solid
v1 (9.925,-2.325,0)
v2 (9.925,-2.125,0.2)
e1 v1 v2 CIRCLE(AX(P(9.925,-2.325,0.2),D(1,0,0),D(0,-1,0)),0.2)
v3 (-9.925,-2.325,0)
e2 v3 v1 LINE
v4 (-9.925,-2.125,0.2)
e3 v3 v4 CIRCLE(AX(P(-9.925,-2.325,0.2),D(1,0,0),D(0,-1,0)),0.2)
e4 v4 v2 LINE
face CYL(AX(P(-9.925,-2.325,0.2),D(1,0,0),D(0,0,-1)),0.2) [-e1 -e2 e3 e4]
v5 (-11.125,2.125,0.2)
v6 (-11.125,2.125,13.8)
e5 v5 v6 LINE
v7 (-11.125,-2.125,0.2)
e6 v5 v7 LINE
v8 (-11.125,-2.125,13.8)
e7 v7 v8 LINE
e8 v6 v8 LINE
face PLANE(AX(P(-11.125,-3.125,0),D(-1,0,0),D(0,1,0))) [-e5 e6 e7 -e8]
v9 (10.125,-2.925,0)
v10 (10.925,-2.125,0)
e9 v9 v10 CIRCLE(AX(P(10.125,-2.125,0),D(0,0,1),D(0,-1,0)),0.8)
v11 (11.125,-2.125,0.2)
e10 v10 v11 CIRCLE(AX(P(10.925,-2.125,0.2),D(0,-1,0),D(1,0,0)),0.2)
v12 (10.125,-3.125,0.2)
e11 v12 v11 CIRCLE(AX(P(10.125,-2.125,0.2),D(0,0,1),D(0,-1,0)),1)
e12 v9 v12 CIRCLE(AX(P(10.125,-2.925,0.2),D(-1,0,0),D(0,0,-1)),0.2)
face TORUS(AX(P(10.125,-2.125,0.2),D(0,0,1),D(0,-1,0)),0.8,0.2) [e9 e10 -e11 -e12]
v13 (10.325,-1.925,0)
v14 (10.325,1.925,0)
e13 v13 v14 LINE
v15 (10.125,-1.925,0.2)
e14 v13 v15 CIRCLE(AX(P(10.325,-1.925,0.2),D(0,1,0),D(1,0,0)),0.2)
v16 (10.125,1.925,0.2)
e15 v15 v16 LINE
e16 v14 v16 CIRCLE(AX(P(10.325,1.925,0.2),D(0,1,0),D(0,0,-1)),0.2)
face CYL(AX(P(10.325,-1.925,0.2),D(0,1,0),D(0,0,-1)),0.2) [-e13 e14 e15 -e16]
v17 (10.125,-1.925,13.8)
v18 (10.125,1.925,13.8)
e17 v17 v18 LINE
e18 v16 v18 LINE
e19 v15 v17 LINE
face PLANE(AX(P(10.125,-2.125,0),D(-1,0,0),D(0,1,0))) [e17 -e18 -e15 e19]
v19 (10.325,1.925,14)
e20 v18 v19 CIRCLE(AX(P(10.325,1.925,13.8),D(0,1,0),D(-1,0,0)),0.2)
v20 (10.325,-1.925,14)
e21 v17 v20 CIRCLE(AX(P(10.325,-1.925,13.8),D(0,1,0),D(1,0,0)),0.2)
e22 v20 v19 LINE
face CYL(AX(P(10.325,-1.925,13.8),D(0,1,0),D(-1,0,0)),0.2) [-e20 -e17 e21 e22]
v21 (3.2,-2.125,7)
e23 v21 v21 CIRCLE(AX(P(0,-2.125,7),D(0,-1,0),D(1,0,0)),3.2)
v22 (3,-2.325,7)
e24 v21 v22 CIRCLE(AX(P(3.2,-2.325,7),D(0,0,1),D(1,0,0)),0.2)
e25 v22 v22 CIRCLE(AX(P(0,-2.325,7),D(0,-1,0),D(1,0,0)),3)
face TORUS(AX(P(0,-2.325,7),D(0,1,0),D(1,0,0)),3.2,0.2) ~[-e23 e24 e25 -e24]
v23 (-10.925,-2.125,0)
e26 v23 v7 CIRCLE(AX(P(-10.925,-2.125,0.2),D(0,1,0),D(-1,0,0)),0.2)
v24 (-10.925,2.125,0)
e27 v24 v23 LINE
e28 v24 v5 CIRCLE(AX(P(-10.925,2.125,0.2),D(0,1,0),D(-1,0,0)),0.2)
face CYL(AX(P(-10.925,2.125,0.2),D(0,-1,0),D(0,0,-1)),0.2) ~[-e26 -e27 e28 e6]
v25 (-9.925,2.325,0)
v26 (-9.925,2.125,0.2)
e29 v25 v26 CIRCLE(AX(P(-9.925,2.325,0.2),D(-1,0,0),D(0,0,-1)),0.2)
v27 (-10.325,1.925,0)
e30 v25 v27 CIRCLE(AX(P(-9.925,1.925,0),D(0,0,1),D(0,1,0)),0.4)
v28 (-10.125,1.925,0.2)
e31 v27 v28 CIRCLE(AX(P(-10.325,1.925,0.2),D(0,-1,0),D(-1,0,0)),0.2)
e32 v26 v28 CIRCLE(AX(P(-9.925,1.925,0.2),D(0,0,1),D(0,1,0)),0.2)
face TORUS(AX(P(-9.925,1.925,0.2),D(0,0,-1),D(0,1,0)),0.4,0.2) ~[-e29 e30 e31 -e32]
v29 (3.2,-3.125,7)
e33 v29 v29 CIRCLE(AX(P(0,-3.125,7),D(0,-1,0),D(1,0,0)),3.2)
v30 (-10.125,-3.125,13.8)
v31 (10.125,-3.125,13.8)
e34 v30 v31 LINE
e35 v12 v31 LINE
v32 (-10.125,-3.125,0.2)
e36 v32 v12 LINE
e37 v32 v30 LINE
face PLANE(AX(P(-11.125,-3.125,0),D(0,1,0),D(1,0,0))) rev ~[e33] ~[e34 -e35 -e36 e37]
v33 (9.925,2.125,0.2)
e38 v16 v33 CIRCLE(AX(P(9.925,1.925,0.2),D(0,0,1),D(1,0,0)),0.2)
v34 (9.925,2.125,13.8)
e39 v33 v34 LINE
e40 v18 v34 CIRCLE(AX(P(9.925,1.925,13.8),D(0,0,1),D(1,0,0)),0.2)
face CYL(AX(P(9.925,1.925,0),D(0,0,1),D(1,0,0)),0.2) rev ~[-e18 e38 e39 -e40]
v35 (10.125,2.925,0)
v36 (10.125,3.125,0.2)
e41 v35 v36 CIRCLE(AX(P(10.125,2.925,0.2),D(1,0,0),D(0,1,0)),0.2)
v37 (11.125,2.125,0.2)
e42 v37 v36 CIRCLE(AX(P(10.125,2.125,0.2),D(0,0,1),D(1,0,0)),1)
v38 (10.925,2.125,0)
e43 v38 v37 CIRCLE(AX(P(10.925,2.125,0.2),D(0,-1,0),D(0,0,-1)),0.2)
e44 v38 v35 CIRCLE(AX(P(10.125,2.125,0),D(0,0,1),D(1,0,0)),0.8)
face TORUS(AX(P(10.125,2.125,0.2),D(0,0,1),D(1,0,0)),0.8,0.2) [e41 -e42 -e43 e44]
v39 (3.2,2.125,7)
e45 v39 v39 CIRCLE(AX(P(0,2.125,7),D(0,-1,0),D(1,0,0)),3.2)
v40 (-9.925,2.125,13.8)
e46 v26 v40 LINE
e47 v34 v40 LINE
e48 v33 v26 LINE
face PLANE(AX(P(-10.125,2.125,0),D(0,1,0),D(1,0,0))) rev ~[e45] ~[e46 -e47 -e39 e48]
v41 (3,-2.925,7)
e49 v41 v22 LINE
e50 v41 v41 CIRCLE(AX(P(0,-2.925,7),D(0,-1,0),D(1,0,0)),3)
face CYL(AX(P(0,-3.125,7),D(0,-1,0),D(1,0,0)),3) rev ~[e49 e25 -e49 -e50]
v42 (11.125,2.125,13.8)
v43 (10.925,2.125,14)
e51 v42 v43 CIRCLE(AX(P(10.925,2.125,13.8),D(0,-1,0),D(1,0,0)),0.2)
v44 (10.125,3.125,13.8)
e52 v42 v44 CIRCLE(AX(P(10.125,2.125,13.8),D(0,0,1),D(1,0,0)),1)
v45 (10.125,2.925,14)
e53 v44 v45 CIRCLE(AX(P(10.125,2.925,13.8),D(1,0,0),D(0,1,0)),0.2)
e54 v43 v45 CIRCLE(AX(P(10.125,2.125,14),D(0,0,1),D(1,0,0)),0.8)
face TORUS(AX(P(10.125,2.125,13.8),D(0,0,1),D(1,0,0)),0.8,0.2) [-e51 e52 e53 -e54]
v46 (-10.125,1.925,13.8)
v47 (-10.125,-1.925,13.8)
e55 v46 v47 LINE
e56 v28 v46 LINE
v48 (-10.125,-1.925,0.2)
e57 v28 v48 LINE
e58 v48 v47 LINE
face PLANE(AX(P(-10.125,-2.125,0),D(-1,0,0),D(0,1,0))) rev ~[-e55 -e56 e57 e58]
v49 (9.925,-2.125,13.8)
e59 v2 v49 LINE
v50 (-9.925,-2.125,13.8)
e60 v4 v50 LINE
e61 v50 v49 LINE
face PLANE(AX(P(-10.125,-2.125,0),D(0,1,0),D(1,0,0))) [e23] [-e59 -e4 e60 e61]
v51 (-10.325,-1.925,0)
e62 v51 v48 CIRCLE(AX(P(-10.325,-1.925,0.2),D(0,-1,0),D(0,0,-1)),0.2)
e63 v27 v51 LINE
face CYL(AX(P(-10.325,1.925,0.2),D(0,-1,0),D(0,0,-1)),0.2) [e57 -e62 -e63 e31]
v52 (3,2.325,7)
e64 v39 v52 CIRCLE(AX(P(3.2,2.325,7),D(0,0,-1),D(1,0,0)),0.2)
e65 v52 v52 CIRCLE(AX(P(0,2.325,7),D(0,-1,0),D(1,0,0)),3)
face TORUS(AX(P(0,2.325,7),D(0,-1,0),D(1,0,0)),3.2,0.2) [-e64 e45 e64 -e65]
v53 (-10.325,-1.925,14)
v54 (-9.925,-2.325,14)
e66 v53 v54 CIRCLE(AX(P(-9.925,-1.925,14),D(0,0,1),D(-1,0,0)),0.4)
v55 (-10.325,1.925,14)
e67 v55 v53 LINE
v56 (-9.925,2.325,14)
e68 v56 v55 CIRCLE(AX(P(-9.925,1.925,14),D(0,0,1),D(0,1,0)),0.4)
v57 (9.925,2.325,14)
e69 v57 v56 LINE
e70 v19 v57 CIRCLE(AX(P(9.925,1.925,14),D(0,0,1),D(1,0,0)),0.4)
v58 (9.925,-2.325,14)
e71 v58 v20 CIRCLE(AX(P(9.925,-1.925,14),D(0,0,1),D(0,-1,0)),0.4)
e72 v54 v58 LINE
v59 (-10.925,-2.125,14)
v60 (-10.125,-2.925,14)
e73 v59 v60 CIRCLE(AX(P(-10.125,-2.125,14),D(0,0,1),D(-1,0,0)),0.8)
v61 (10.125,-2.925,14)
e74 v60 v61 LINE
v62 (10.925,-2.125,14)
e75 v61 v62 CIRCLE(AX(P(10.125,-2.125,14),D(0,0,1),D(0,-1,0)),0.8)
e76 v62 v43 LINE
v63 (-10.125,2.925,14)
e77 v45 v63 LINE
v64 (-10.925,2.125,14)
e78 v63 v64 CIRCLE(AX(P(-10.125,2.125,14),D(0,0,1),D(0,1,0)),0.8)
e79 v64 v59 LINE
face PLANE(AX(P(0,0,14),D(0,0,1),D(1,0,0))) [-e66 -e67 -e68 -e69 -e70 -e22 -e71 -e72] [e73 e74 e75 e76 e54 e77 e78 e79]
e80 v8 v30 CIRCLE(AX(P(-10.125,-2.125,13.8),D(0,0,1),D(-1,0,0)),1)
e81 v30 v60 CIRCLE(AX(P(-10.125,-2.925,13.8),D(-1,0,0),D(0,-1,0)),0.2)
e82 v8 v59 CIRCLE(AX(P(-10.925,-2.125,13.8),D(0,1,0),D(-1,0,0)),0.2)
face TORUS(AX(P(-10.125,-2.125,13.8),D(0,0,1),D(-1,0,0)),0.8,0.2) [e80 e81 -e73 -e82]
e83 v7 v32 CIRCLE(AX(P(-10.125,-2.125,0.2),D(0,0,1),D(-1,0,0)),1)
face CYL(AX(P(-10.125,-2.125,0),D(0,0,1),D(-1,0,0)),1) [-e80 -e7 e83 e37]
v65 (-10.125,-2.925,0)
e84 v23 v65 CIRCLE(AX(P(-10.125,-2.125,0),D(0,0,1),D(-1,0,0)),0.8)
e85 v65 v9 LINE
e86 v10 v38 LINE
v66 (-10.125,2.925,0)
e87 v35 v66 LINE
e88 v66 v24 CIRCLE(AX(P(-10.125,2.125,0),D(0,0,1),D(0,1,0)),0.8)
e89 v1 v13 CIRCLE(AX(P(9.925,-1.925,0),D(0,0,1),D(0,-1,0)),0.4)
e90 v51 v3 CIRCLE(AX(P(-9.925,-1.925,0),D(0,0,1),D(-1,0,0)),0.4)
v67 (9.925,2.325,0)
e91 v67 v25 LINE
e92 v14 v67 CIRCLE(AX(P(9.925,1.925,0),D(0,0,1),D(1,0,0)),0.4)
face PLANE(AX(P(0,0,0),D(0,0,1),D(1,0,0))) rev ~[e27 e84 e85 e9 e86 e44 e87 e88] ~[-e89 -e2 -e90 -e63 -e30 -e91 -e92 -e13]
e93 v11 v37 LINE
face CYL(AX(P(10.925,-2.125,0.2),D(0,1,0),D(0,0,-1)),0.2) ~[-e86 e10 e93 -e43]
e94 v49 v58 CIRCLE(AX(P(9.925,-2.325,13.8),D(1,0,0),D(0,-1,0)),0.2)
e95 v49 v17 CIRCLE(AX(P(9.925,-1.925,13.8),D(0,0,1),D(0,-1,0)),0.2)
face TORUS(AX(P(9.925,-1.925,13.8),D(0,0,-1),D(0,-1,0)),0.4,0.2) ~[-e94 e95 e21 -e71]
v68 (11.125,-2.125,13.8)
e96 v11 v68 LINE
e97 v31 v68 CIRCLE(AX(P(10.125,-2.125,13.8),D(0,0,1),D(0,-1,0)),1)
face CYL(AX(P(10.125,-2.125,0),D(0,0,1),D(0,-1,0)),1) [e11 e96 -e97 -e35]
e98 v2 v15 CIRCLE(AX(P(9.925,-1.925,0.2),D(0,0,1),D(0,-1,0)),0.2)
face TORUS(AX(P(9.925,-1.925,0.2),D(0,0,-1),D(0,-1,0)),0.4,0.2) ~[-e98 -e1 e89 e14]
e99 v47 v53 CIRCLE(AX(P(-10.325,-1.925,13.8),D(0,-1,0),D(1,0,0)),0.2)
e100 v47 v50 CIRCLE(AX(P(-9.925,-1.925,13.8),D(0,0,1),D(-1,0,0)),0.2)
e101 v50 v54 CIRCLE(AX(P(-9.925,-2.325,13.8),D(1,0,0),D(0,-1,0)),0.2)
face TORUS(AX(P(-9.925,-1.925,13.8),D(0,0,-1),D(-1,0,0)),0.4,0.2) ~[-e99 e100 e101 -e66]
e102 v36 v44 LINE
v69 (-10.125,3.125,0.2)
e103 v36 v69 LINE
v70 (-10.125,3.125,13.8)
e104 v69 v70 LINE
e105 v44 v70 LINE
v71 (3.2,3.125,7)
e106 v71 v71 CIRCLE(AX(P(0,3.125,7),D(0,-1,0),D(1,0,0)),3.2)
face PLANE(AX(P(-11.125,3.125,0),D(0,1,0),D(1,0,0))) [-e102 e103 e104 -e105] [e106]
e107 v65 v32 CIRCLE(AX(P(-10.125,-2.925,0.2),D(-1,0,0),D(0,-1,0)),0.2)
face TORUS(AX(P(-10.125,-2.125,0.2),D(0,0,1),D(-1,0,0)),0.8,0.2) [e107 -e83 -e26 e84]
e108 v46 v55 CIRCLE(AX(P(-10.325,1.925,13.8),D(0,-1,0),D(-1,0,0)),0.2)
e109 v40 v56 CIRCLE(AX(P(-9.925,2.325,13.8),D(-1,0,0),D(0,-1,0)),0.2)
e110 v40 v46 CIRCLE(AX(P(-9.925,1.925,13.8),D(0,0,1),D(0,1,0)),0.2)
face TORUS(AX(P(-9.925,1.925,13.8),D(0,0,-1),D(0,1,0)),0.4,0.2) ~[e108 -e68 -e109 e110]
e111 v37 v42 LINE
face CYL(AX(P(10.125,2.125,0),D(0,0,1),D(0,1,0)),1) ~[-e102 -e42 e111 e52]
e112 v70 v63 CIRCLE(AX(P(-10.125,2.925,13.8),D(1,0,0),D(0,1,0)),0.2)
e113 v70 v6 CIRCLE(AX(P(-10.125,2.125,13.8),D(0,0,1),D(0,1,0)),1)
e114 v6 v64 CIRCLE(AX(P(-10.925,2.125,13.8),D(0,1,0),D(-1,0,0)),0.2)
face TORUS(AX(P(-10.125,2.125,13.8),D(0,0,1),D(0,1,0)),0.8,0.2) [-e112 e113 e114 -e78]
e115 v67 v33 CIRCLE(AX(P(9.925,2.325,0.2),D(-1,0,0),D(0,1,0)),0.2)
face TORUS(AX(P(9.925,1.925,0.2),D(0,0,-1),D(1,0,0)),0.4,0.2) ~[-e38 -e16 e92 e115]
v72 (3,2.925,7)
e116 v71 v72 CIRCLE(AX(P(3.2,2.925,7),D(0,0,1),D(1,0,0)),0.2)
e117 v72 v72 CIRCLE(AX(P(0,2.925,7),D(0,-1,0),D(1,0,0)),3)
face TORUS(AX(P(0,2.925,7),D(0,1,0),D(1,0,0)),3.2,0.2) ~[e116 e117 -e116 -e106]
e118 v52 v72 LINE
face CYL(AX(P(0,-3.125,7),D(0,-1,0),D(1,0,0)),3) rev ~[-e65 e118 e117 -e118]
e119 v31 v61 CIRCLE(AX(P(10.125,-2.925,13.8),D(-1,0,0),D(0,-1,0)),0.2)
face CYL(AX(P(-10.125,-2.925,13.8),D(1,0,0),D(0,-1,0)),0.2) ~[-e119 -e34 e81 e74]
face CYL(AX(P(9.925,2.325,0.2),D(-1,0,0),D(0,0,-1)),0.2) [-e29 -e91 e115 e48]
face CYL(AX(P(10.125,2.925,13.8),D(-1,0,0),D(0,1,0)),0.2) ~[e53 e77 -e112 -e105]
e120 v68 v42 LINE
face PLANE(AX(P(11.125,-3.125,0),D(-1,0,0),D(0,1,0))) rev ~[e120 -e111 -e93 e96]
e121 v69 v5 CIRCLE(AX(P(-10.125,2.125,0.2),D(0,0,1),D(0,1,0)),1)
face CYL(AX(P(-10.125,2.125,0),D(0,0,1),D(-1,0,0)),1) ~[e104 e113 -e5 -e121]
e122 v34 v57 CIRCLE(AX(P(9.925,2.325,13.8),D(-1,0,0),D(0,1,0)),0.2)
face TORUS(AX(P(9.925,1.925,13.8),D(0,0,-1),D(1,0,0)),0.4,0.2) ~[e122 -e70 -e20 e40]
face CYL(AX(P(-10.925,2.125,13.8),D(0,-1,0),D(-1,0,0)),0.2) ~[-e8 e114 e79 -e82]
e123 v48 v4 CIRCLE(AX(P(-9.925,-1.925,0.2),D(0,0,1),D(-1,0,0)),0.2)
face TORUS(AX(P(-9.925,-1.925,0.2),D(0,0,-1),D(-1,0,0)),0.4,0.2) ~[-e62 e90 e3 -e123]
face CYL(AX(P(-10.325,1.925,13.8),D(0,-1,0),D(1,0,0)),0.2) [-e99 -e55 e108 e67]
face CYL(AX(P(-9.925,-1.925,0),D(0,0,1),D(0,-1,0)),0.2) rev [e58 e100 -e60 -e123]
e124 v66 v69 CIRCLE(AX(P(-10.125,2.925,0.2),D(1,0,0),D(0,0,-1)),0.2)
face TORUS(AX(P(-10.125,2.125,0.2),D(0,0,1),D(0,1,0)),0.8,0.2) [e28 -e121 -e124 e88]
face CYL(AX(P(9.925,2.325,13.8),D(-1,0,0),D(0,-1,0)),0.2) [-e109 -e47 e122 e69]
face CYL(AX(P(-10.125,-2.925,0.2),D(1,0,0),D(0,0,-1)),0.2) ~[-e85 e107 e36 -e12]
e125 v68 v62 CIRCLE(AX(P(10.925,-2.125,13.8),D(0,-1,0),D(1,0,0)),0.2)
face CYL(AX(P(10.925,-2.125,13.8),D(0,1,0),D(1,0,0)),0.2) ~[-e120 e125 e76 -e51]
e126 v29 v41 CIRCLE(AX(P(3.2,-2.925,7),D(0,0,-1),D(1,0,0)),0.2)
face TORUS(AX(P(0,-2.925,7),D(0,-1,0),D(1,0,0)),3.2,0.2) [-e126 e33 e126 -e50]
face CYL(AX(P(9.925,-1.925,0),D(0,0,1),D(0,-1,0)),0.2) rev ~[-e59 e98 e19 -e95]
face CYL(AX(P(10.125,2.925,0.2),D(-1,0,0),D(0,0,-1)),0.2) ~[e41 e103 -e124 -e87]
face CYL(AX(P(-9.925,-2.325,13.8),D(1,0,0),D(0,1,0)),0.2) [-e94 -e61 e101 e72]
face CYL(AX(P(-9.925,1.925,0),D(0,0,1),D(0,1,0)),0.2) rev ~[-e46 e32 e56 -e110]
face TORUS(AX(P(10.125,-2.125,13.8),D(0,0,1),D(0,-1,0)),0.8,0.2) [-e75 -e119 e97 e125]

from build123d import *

# Parameters (mm, degrees)
F0_W     = 22.25
F0_H     = 6.25
F0_W_2   = 20.25
F0_H_2   = 4.25
F1_DEPTH = 14
F2_R     = 1
F3_R     = 0.2
F4_R     = 0.2
F5_R     = 3
F6_DEPTH = 6.251
F7_R     = 0.2


with BuildPart() as f1:
    # F0 (on Top) → F1 (new body)
    with BuildSketch(Plane.XY):
        Rectangle(F0_W, F0_H)
        Rectangle(F0_W_2, F0_H_2, mode=Mode.SUBTRACT)
    extrude(amount=F1_DEPTH)

    # F2
    f2_edges = [f1.edges().sort_by_distance(p)[0] for p in [
        (-11.125, -3.125, 7),
        (-11.125, 3.125, 7),
        (11.125, 3.125, 7),
        (11.125, -3.125, 7),
    ]]
    fillet(f2_edges, radius=F2_R)

    # F3
    f3_edges = [f1.edges().sort_by_distance(p)[0] for p in [
        (-10.125, 2.125, 7),
        (-10.125, -2.125, 7),
        (10.125, 2.125, 7),
        (10.125, -2.125, 7),
    ]]
    fillet(f3_edges, radius=F3_R)

    # F4
    f4_edges = [f1.edges().sort_by_distance(p)[0] for p in [
        (-10.832107, -2.832107, 14),
        (-10.832107, -2.832107, 0),
        (10.066421, -2.066421, 14),
        (10.066421, -2.066421, 0),
        (10.125, 0, 0),
        (10.066421, 2.066421, 0),
        (0, 2.125, 0),
        (0, -2.125, 0),
        (-10.066421, 2.066421, 0),
        (-10.066421, -2.066421, 0),
        (-10.125, 0, 0),
        (11.125, 0, 0),
        (10.832107, -2.832107, 0),
        (10.832107, 2.832107, 0),
        (0, -3.125, 0),
        (0, 3.125, 0),
        (-10.832107, 2.832107, 0),
        (-11.125, 0, 0),
        (10.125, 0, 14),
        (10.066421, 2.066421, 14),
        (0, 2.125, 14),
        (0, -2.125, 14),
        (-10.066421, 2.066421, 14),
        (-10.066421, -2.066421, 14),
        (-10.125, 0, 14),
        (11.125, 0, 14),
        (10.832107, -2.832107, 14),
        (10.832107, 2.832107, 14),
        (0, -3.125, 14),
        (0, 3.125, 14),
        (-10.832107, 2.832107, 14),
        (-11.125, 0, 14),
    ]]
    fillet(f4_edges, radius=F4_R)

    # F5 (on face) → F6 (cut, through all)
    with BuildSketch(Plane.XZ.offset(3.125)):
        with Locations((0, 7)):
            Circle(F5_R)
    extrude(amount=-F6_DEPTH, mode=Mode.SUBTRACT)

    # F7
    f7_edges = [f1.edges().sort_by_distance(p)[0] for p in [
        (-3, 3.125, 7),
        (-3, -3.125, 7),
        (-3, -2.125, 7),
        (-3, 2.125, 7),
    ]]
    fillet(f7_edges, radius=F7_R)


solid = f1.part
